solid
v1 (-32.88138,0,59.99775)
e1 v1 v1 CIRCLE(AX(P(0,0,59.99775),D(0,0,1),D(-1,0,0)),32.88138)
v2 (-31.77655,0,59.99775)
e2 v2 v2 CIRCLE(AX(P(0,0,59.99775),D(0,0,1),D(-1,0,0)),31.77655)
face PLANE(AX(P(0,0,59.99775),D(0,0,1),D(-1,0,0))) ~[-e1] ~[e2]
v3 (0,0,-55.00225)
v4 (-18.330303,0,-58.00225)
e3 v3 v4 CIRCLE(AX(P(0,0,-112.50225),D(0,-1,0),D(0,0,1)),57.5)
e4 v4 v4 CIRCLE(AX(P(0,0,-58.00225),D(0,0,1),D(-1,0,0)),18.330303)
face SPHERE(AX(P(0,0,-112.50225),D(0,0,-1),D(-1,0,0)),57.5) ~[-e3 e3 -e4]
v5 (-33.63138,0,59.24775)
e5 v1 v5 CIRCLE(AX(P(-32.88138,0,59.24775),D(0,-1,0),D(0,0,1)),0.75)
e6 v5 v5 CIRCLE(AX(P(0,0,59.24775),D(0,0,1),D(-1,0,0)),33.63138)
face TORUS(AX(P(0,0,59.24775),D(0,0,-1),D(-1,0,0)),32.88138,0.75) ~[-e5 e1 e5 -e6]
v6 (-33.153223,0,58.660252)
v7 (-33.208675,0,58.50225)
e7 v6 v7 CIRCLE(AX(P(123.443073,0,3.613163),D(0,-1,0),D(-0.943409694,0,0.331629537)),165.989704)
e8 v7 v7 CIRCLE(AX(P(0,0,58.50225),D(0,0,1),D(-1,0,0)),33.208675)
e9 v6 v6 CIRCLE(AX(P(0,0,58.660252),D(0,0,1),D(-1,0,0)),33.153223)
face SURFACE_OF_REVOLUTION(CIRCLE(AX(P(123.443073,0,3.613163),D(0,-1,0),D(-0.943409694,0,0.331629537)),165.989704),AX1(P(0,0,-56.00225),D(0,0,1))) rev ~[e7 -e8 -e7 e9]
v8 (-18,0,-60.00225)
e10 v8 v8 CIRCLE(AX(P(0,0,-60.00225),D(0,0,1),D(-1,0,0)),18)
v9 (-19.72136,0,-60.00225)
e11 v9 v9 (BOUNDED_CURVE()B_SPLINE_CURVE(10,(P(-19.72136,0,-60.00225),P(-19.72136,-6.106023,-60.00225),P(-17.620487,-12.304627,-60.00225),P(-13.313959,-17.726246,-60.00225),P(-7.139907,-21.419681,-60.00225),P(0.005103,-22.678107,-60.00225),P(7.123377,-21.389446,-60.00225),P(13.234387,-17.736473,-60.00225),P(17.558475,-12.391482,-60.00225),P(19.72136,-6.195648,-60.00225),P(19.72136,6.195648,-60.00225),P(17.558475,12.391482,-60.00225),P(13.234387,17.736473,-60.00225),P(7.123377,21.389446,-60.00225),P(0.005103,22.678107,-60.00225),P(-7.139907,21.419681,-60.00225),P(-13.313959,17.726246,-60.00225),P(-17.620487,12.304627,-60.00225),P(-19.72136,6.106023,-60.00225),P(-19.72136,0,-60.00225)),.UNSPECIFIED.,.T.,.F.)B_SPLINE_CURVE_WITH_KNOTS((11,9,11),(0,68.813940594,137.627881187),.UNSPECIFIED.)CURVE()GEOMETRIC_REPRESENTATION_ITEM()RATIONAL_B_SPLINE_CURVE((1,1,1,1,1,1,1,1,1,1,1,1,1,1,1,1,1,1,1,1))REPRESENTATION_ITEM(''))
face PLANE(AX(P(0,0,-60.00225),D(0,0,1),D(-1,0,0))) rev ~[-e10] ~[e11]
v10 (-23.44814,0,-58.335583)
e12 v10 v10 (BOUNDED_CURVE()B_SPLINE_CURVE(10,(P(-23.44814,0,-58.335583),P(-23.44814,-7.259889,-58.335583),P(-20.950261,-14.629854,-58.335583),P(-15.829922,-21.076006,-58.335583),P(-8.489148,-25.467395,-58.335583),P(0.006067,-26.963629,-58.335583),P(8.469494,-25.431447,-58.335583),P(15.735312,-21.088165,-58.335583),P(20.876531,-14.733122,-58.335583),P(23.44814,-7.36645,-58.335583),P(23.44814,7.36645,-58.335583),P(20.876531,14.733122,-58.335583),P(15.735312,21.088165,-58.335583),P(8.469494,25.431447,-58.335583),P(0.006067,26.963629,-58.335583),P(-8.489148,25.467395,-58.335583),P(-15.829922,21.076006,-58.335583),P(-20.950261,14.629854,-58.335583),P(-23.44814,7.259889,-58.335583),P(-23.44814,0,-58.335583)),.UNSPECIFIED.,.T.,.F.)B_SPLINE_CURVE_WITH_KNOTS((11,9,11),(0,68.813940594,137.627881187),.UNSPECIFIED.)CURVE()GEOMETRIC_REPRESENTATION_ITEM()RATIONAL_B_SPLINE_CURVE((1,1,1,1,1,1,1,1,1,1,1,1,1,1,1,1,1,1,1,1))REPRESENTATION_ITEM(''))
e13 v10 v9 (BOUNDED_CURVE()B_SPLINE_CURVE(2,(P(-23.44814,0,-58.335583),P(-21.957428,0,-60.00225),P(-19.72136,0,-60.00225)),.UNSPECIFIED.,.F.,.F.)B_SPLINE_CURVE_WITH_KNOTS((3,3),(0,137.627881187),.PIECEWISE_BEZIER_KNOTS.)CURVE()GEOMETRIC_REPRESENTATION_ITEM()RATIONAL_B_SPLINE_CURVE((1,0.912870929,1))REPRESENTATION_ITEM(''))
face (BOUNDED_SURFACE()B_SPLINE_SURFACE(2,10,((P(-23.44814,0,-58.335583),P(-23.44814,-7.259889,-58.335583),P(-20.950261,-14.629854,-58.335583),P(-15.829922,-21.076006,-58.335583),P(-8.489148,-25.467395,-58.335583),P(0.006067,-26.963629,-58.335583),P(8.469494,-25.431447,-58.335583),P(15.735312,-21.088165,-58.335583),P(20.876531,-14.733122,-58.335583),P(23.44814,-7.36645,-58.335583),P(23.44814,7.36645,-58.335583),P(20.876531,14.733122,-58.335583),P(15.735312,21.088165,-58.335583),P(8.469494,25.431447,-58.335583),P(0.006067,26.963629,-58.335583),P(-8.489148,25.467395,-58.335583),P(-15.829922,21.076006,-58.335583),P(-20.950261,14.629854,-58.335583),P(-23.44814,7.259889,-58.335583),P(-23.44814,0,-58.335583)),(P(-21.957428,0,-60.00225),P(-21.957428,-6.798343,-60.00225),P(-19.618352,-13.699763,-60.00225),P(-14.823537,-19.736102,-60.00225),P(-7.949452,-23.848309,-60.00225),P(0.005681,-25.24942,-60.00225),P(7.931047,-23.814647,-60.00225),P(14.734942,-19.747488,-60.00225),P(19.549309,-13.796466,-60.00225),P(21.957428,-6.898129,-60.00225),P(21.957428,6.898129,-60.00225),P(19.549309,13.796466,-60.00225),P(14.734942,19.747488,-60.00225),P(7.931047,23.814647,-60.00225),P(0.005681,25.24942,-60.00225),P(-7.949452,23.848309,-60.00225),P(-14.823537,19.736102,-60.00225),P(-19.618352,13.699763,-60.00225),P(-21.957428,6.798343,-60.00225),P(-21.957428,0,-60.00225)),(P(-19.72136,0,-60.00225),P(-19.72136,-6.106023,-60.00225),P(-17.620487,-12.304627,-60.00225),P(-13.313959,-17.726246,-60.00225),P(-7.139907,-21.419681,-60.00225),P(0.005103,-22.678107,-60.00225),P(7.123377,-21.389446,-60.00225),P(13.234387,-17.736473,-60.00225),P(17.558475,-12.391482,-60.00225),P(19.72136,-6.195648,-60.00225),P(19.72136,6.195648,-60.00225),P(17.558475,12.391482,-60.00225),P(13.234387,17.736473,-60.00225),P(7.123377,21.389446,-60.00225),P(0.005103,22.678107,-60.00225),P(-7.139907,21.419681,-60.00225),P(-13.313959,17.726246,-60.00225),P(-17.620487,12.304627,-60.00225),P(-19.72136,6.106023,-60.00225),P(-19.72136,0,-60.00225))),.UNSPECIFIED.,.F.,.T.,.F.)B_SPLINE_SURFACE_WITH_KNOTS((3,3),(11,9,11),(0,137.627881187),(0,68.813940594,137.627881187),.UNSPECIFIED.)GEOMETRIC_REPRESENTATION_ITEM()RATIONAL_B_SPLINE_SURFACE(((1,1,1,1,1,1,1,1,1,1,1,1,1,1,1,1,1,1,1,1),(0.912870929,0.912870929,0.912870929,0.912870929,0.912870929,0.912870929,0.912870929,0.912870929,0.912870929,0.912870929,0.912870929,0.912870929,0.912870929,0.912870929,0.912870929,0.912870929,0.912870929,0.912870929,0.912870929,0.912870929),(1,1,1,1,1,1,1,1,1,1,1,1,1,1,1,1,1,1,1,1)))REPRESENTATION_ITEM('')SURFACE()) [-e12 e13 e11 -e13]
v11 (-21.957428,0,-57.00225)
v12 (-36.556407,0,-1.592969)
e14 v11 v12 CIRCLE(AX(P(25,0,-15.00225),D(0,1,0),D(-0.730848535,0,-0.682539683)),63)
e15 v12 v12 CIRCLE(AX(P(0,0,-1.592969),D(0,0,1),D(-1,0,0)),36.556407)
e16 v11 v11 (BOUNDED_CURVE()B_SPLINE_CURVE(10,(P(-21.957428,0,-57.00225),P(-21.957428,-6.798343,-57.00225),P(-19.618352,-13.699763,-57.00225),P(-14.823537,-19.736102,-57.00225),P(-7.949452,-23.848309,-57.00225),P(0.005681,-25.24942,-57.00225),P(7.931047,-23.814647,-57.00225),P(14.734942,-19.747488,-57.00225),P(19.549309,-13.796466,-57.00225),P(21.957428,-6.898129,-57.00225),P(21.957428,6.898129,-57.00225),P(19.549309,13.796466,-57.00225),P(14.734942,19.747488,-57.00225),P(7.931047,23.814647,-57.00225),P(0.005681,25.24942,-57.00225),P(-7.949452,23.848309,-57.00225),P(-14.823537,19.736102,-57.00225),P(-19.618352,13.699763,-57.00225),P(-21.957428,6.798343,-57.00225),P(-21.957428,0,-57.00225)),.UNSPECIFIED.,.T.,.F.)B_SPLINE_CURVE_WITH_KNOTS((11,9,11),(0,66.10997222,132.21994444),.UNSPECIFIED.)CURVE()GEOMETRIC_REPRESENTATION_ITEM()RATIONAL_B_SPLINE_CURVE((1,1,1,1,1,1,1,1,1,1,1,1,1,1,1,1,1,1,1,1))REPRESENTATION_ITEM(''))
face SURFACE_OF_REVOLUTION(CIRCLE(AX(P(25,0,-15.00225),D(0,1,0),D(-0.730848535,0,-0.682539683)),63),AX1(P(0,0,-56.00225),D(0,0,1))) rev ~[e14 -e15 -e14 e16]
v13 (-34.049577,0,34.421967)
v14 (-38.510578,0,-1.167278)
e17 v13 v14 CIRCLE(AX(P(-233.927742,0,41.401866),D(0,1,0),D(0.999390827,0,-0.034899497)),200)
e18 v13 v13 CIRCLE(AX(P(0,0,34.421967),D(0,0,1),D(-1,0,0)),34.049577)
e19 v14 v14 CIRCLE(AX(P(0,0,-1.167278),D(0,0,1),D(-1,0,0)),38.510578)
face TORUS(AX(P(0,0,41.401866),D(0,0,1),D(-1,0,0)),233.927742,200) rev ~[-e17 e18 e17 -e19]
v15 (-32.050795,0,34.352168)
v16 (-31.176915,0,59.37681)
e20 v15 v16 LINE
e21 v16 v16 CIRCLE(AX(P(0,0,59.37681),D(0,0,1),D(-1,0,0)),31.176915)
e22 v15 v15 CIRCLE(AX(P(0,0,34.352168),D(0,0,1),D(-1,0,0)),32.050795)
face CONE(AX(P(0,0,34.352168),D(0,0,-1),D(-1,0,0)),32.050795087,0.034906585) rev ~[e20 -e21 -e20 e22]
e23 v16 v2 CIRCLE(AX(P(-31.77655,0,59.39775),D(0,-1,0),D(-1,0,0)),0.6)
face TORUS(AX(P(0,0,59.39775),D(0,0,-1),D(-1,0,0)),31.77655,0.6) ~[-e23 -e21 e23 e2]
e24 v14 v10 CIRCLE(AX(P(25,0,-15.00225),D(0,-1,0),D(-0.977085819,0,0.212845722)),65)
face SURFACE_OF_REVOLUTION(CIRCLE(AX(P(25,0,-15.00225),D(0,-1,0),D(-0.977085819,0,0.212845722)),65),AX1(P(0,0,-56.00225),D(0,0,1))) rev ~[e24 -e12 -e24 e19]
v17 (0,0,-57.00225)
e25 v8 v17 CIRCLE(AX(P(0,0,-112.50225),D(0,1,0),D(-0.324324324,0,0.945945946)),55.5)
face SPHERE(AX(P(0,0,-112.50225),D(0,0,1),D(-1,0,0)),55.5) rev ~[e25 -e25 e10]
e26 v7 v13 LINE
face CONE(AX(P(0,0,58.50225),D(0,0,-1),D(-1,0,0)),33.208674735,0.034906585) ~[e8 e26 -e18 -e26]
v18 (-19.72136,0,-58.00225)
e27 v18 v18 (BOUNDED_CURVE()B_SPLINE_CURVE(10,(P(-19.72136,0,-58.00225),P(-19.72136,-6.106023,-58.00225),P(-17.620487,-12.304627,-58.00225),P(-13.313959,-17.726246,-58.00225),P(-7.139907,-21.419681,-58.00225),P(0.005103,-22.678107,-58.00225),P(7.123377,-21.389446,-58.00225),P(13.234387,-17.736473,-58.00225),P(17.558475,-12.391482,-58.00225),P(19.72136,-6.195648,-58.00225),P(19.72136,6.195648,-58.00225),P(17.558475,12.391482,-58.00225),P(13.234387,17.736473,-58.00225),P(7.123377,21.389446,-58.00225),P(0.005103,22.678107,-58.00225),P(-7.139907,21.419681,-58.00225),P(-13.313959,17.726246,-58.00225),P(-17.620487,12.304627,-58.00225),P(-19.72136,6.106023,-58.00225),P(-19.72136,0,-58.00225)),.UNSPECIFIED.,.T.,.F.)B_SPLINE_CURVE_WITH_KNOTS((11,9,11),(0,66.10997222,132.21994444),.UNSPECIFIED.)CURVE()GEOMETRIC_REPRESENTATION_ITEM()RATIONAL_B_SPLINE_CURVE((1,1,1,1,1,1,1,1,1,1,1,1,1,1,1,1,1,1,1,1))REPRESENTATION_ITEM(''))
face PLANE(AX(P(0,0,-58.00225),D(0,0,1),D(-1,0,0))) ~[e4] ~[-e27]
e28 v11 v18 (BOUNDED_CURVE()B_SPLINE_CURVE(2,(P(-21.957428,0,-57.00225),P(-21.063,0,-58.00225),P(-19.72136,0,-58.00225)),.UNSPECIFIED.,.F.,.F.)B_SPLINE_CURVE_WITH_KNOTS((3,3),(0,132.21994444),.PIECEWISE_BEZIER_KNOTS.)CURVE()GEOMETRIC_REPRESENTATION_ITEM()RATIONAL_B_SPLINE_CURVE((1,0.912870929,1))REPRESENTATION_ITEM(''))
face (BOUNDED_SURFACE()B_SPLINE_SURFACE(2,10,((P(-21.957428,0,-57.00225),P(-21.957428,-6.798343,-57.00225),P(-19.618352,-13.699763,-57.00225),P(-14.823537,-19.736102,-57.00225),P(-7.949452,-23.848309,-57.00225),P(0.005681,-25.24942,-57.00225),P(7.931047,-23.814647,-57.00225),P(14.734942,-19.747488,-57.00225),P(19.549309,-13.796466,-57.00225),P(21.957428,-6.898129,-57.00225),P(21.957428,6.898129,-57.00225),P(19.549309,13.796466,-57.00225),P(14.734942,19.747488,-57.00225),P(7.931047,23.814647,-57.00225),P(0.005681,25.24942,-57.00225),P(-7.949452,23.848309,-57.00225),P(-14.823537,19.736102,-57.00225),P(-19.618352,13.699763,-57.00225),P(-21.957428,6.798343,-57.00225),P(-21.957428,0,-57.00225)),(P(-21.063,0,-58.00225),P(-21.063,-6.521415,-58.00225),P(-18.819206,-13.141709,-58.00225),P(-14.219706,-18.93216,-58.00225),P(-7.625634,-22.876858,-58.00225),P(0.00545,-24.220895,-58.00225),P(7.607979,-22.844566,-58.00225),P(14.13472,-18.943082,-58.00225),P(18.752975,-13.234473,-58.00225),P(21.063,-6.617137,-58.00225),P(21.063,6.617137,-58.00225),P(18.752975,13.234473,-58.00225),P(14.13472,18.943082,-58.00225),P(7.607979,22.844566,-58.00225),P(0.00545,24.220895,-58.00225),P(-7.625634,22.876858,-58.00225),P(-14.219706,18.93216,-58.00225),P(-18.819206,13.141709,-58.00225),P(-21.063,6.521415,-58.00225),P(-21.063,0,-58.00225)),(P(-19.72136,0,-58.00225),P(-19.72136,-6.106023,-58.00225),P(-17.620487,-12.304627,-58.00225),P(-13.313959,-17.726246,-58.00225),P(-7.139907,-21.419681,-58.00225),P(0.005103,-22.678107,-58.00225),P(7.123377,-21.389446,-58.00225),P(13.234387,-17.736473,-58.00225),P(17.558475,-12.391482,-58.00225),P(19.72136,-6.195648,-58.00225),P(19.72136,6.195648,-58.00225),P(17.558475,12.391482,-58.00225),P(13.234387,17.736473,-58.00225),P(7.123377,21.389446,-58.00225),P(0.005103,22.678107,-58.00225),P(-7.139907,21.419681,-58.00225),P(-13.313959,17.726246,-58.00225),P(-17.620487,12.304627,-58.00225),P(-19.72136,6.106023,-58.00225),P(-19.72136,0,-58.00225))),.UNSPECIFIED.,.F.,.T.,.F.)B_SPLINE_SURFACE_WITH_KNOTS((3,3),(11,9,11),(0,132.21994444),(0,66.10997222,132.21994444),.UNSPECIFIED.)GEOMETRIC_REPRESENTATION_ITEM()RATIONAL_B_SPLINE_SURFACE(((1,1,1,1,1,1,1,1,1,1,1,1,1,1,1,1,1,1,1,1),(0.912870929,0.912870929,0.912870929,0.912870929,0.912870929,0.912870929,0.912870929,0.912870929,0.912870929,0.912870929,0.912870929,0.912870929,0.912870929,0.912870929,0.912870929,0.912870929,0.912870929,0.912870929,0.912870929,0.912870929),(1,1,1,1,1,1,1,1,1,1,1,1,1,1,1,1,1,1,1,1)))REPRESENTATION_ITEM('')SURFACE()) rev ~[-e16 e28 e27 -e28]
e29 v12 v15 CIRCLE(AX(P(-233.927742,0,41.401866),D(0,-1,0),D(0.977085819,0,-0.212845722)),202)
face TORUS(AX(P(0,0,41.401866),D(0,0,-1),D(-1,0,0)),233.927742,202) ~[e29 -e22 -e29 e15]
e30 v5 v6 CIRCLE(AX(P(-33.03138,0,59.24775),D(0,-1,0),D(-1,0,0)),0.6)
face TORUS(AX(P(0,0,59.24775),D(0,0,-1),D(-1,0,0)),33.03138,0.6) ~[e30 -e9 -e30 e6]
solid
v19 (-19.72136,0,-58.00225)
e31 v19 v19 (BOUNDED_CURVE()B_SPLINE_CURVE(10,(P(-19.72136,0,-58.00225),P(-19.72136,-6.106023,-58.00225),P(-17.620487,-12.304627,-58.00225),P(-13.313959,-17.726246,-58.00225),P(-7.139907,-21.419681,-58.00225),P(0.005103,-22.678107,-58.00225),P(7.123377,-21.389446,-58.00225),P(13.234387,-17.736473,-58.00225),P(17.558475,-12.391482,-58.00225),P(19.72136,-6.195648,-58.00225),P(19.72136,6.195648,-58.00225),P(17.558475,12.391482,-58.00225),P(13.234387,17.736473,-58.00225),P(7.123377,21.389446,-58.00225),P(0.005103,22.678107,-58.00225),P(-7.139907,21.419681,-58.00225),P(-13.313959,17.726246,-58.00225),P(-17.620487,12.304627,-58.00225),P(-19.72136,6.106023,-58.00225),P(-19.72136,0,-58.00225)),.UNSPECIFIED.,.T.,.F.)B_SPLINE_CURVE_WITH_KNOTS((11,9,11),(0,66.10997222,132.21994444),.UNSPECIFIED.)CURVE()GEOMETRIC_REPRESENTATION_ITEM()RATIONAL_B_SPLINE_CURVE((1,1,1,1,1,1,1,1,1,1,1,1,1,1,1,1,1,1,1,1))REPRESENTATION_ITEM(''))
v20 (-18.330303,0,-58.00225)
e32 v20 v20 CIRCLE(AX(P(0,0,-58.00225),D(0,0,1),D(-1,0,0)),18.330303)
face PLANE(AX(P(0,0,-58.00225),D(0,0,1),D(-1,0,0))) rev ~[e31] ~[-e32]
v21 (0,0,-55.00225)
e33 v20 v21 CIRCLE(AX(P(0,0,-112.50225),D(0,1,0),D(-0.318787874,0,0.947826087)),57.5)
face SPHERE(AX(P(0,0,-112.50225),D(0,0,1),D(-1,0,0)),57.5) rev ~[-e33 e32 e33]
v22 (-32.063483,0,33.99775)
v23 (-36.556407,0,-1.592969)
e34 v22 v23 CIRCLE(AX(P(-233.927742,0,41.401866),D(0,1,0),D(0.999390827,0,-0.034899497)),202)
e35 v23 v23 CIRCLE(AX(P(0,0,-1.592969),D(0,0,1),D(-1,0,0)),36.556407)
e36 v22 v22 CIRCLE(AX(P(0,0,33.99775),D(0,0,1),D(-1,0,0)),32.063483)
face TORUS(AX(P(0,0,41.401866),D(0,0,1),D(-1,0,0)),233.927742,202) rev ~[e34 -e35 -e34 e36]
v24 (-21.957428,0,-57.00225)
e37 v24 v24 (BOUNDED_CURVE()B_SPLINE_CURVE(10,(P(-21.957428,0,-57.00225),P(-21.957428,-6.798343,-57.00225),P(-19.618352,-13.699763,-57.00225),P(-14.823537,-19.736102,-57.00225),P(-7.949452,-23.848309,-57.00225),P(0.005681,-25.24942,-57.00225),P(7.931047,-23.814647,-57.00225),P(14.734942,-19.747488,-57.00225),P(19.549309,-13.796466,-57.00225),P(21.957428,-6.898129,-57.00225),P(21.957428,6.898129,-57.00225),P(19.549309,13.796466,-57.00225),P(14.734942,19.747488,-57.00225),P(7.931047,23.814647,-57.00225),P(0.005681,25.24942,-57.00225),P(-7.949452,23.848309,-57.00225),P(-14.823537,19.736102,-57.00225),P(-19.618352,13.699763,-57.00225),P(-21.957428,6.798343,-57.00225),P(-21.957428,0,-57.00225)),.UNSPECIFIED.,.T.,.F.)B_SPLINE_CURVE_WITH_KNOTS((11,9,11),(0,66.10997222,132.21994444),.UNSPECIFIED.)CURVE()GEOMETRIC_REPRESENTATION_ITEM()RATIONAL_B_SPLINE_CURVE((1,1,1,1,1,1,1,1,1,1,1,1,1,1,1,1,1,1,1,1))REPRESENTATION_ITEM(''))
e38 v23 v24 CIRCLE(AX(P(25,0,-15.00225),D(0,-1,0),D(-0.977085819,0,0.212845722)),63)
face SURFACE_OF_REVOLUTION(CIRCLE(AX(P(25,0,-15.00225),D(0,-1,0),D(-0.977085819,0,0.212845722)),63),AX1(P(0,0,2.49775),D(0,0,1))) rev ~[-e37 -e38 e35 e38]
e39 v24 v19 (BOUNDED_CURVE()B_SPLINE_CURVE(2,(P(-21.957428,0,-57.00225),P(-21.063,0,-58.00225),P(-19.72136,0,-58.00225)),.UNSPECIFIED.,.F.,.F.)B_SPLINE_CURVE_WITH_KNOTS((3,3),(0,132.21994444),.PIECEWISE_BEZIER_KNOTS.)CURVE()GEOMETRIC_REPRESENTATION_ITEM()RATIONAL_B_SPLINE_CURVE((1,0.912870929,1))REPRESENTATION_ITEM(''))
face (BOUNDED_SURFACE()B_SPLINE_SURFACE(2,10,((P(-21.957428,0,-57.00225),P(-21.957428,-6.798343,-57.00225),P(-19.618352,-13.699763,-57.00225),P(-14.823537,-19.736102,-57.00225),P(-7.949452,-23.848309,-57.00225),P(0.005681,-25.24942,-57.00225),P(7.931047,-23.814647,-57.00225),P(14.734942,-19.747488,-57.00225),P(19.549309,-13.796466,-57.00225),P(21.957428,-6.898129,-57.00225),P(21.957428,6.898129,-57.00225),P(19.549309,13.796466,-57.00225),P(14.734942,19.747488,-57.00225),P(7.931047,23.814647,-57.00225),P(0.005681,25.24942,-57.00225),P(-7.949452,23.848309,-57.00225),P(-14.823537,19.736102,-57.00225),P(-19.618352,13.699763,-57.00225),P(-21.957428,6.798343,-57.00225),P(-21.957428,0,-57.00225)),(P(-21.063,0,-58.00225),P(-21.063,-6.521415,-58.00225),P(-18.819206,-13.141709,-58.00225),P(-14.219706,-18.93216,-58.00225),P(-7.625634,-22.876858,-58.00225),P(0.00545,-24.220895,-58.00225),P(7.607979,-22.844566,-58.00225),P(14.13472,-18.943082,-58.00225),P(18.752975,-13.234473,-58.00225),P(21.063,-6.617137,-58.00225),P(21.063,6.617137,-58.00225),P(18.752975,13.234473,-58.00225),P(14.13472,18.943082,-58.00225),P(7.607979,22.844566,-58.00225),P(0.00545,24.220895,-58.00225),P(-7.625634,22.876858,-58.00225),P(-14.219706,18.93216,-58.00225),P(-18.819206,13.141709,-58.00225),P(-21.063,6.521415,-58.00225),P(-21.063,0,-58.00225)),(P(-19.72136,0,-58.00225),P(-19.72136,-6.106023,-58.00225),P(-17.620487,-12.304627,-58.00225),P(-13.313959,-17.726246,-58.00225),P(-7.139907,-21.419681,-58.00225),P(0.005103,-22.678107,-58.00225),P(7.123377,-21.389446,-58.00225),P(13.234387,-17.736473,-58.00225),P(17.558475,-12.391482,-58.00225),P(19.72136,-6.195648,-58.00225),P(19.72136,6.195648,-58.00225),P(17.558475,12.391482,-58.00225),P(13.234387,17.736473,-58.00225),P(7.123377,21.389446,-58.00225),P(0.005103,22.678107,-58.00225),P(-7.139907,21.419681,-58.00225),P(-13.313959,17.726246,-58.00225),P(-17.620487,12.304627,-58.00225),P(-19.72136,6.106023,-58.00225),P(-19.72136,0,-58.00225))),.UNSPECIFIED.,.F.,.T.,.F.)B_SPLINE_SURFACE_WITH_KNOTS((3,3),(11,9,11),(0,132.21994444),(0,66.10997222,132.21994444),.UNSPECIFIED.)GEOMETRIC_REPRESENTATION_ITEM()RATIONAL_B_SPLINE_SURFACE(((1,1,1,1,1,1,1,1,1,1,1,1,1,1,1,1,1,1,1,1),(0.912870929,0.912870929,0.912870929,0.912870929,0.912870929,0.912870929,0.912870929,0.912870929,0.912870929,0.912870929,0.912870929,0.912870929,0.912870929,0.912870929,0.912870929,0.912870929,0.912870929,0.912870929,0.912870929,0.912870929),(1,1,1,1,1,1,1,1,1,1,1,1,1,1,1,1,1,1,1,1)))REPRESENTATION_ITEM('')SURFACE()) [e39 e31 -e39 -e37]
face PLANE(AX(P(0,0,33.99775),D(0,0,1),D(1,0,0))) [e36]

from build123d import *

# Parameters (mm, degrees)
F4_R      = 5
F5_R      = 3
F6_R      = 0.6
F9_R      = 3
F10_R     = 90.5961026067
F11_DEPTH = 26


with BuildPart() as f3:
    # F2 (on Front) → F3 (revolve)
    with BuildSketch(Plane.XZ):
        with BuildLine():
            Line((-31.1552316325, 59.99775), (-32.88138, 59.99775))
            ThreePointArc((-32.88138, 59.99775), (-33.4117100859, 59.7780800859), (-33.63138, 59.24775))
            ThreePointArc((-33.63138, 59.24775), (-33.4967324831, 58.8690059354), (-33.1532231118, 58.6602516969))
            ThreePointArc((-33.1532231118, 58.6602516969), (-33.1809688474, 58.5812577945), (-33.2086747351, 58.5022499072))
            Line((-33.2086747351, 58.5022499072), (-34.0495767416, 34.4219670651))
            ThreePointArc((-34.0495767416, 34.4219670651), (-35.4806511336, 16.5271388904), (-38.5105782621, -1.1672780515))
            ThreePointArc((-38.5105782621, -1.1672780515), (-37.5559106306, -32.6589214071), (-21.9041575982, -60.00225))
            Line((-21.9041575982, -60.00225), (-18, -60.00225))
            ThreePointArc((-18, -60.00225), (-9.1241437954, -57.7573872273), (0, -57.00225))
            Line((0, -57.00225), (0, -55.00225))
            ThreePointArc((0, -55.00225), (-9.2870878105, -55.7572061636), (-18.3303027798, -58.00225))
            Line((-18.3303027798, -58.00225), (-21.0434577329, -58.00225))
            ThreePointArc((-21.0434577329, -58.00225), (-35.7448305135, -31.7075056368), (-36.5564066232, -1.592969496))
            ThreePointArc((-36.5564066232, -1.592969496), (-33.4961802235, 16.2783916153), (-32.0507950875, 34.3521680717))
            Line((-32.0507950875, 34.3521680717), (-31.1552316325, 59.99775))
        make_face()
    revolve(axis=Axis((0, 0, -56.00225), (0, 0, 1)))

    # F4
    f4_edges = [f3.edges().sort_by_distance(p)[0] for p in [
        (21.904158, 0, -60.00225),
    ]]
    fillet(f4_edges, radius=F4_R)

    # F5
    f5_edges = [f3.edges().sort_by_distance(p)[0] for p in [
        (21.043458, 0, -58.00225),
    ]]
    fillet(f5_edges, radius=F5_R)

    # F6
    f6_edges = [f3.edges().sort_by_distance(p)[0] for p in [
        (31.155232, 0, 59.99775),
    ]]
    fillet(f6_edges, radius=F6_R)


with BuildPart() as f8:
    # F7 (on Front) → F8 (revolve)
    with BuildSketch(Plane.XZ):
        with BuildLine():
            ThreePointArc((-31.7765498208, 59.99775), (-31.3449459406, 59.8145450223), (-31.1769153246, 59.376810302))
            Line((-31.1769153246, 59.376810302), (-32.0507950875, 34.3521680717))
            ThreePointArc((-32.0507950875, 34.3521680717), (-33.4961802235, 16.2783916153), (-36.5564066232, -1.592969496))
            ThreePointArc((-36.5564066232, -1.592969496), (-35.7448305135, -31.7075056368), (-21.0434577329, -58.00225))
            Line((-21.0434577329, -58.00225), (-18.3303027798, -58.00225))
            ThreePointArc((-18.3303027798, -58.00225), (-9.2870878105, -55.7572061636), (0, -55.00225))
            Line((0, -55.00225), (0, 59.99775))
            Line((0, 59.99775), (-31.7765498208, 59.99775))
        make_face()
    revolve(axis=Axis((0, 0, 2.49775), (0, 0, 1)))

    # F9
    f9_edges = [f8.edges().sort_by_distance(p)[0] for p in [
        (21.043458, 0, -58.00225),
    ]]
    fillet(f9_edges, radius=F9_R)

    # F10 (on face) → F11 (cut)
    with BuildSketch(Plane.XY.offset(59.99775)):
        Circle(F10_R)
    extrude(amount=-F11_DEPTH, mode=Mode.SUBTRACT)


solid = Compound([f3.part, f8.part])
